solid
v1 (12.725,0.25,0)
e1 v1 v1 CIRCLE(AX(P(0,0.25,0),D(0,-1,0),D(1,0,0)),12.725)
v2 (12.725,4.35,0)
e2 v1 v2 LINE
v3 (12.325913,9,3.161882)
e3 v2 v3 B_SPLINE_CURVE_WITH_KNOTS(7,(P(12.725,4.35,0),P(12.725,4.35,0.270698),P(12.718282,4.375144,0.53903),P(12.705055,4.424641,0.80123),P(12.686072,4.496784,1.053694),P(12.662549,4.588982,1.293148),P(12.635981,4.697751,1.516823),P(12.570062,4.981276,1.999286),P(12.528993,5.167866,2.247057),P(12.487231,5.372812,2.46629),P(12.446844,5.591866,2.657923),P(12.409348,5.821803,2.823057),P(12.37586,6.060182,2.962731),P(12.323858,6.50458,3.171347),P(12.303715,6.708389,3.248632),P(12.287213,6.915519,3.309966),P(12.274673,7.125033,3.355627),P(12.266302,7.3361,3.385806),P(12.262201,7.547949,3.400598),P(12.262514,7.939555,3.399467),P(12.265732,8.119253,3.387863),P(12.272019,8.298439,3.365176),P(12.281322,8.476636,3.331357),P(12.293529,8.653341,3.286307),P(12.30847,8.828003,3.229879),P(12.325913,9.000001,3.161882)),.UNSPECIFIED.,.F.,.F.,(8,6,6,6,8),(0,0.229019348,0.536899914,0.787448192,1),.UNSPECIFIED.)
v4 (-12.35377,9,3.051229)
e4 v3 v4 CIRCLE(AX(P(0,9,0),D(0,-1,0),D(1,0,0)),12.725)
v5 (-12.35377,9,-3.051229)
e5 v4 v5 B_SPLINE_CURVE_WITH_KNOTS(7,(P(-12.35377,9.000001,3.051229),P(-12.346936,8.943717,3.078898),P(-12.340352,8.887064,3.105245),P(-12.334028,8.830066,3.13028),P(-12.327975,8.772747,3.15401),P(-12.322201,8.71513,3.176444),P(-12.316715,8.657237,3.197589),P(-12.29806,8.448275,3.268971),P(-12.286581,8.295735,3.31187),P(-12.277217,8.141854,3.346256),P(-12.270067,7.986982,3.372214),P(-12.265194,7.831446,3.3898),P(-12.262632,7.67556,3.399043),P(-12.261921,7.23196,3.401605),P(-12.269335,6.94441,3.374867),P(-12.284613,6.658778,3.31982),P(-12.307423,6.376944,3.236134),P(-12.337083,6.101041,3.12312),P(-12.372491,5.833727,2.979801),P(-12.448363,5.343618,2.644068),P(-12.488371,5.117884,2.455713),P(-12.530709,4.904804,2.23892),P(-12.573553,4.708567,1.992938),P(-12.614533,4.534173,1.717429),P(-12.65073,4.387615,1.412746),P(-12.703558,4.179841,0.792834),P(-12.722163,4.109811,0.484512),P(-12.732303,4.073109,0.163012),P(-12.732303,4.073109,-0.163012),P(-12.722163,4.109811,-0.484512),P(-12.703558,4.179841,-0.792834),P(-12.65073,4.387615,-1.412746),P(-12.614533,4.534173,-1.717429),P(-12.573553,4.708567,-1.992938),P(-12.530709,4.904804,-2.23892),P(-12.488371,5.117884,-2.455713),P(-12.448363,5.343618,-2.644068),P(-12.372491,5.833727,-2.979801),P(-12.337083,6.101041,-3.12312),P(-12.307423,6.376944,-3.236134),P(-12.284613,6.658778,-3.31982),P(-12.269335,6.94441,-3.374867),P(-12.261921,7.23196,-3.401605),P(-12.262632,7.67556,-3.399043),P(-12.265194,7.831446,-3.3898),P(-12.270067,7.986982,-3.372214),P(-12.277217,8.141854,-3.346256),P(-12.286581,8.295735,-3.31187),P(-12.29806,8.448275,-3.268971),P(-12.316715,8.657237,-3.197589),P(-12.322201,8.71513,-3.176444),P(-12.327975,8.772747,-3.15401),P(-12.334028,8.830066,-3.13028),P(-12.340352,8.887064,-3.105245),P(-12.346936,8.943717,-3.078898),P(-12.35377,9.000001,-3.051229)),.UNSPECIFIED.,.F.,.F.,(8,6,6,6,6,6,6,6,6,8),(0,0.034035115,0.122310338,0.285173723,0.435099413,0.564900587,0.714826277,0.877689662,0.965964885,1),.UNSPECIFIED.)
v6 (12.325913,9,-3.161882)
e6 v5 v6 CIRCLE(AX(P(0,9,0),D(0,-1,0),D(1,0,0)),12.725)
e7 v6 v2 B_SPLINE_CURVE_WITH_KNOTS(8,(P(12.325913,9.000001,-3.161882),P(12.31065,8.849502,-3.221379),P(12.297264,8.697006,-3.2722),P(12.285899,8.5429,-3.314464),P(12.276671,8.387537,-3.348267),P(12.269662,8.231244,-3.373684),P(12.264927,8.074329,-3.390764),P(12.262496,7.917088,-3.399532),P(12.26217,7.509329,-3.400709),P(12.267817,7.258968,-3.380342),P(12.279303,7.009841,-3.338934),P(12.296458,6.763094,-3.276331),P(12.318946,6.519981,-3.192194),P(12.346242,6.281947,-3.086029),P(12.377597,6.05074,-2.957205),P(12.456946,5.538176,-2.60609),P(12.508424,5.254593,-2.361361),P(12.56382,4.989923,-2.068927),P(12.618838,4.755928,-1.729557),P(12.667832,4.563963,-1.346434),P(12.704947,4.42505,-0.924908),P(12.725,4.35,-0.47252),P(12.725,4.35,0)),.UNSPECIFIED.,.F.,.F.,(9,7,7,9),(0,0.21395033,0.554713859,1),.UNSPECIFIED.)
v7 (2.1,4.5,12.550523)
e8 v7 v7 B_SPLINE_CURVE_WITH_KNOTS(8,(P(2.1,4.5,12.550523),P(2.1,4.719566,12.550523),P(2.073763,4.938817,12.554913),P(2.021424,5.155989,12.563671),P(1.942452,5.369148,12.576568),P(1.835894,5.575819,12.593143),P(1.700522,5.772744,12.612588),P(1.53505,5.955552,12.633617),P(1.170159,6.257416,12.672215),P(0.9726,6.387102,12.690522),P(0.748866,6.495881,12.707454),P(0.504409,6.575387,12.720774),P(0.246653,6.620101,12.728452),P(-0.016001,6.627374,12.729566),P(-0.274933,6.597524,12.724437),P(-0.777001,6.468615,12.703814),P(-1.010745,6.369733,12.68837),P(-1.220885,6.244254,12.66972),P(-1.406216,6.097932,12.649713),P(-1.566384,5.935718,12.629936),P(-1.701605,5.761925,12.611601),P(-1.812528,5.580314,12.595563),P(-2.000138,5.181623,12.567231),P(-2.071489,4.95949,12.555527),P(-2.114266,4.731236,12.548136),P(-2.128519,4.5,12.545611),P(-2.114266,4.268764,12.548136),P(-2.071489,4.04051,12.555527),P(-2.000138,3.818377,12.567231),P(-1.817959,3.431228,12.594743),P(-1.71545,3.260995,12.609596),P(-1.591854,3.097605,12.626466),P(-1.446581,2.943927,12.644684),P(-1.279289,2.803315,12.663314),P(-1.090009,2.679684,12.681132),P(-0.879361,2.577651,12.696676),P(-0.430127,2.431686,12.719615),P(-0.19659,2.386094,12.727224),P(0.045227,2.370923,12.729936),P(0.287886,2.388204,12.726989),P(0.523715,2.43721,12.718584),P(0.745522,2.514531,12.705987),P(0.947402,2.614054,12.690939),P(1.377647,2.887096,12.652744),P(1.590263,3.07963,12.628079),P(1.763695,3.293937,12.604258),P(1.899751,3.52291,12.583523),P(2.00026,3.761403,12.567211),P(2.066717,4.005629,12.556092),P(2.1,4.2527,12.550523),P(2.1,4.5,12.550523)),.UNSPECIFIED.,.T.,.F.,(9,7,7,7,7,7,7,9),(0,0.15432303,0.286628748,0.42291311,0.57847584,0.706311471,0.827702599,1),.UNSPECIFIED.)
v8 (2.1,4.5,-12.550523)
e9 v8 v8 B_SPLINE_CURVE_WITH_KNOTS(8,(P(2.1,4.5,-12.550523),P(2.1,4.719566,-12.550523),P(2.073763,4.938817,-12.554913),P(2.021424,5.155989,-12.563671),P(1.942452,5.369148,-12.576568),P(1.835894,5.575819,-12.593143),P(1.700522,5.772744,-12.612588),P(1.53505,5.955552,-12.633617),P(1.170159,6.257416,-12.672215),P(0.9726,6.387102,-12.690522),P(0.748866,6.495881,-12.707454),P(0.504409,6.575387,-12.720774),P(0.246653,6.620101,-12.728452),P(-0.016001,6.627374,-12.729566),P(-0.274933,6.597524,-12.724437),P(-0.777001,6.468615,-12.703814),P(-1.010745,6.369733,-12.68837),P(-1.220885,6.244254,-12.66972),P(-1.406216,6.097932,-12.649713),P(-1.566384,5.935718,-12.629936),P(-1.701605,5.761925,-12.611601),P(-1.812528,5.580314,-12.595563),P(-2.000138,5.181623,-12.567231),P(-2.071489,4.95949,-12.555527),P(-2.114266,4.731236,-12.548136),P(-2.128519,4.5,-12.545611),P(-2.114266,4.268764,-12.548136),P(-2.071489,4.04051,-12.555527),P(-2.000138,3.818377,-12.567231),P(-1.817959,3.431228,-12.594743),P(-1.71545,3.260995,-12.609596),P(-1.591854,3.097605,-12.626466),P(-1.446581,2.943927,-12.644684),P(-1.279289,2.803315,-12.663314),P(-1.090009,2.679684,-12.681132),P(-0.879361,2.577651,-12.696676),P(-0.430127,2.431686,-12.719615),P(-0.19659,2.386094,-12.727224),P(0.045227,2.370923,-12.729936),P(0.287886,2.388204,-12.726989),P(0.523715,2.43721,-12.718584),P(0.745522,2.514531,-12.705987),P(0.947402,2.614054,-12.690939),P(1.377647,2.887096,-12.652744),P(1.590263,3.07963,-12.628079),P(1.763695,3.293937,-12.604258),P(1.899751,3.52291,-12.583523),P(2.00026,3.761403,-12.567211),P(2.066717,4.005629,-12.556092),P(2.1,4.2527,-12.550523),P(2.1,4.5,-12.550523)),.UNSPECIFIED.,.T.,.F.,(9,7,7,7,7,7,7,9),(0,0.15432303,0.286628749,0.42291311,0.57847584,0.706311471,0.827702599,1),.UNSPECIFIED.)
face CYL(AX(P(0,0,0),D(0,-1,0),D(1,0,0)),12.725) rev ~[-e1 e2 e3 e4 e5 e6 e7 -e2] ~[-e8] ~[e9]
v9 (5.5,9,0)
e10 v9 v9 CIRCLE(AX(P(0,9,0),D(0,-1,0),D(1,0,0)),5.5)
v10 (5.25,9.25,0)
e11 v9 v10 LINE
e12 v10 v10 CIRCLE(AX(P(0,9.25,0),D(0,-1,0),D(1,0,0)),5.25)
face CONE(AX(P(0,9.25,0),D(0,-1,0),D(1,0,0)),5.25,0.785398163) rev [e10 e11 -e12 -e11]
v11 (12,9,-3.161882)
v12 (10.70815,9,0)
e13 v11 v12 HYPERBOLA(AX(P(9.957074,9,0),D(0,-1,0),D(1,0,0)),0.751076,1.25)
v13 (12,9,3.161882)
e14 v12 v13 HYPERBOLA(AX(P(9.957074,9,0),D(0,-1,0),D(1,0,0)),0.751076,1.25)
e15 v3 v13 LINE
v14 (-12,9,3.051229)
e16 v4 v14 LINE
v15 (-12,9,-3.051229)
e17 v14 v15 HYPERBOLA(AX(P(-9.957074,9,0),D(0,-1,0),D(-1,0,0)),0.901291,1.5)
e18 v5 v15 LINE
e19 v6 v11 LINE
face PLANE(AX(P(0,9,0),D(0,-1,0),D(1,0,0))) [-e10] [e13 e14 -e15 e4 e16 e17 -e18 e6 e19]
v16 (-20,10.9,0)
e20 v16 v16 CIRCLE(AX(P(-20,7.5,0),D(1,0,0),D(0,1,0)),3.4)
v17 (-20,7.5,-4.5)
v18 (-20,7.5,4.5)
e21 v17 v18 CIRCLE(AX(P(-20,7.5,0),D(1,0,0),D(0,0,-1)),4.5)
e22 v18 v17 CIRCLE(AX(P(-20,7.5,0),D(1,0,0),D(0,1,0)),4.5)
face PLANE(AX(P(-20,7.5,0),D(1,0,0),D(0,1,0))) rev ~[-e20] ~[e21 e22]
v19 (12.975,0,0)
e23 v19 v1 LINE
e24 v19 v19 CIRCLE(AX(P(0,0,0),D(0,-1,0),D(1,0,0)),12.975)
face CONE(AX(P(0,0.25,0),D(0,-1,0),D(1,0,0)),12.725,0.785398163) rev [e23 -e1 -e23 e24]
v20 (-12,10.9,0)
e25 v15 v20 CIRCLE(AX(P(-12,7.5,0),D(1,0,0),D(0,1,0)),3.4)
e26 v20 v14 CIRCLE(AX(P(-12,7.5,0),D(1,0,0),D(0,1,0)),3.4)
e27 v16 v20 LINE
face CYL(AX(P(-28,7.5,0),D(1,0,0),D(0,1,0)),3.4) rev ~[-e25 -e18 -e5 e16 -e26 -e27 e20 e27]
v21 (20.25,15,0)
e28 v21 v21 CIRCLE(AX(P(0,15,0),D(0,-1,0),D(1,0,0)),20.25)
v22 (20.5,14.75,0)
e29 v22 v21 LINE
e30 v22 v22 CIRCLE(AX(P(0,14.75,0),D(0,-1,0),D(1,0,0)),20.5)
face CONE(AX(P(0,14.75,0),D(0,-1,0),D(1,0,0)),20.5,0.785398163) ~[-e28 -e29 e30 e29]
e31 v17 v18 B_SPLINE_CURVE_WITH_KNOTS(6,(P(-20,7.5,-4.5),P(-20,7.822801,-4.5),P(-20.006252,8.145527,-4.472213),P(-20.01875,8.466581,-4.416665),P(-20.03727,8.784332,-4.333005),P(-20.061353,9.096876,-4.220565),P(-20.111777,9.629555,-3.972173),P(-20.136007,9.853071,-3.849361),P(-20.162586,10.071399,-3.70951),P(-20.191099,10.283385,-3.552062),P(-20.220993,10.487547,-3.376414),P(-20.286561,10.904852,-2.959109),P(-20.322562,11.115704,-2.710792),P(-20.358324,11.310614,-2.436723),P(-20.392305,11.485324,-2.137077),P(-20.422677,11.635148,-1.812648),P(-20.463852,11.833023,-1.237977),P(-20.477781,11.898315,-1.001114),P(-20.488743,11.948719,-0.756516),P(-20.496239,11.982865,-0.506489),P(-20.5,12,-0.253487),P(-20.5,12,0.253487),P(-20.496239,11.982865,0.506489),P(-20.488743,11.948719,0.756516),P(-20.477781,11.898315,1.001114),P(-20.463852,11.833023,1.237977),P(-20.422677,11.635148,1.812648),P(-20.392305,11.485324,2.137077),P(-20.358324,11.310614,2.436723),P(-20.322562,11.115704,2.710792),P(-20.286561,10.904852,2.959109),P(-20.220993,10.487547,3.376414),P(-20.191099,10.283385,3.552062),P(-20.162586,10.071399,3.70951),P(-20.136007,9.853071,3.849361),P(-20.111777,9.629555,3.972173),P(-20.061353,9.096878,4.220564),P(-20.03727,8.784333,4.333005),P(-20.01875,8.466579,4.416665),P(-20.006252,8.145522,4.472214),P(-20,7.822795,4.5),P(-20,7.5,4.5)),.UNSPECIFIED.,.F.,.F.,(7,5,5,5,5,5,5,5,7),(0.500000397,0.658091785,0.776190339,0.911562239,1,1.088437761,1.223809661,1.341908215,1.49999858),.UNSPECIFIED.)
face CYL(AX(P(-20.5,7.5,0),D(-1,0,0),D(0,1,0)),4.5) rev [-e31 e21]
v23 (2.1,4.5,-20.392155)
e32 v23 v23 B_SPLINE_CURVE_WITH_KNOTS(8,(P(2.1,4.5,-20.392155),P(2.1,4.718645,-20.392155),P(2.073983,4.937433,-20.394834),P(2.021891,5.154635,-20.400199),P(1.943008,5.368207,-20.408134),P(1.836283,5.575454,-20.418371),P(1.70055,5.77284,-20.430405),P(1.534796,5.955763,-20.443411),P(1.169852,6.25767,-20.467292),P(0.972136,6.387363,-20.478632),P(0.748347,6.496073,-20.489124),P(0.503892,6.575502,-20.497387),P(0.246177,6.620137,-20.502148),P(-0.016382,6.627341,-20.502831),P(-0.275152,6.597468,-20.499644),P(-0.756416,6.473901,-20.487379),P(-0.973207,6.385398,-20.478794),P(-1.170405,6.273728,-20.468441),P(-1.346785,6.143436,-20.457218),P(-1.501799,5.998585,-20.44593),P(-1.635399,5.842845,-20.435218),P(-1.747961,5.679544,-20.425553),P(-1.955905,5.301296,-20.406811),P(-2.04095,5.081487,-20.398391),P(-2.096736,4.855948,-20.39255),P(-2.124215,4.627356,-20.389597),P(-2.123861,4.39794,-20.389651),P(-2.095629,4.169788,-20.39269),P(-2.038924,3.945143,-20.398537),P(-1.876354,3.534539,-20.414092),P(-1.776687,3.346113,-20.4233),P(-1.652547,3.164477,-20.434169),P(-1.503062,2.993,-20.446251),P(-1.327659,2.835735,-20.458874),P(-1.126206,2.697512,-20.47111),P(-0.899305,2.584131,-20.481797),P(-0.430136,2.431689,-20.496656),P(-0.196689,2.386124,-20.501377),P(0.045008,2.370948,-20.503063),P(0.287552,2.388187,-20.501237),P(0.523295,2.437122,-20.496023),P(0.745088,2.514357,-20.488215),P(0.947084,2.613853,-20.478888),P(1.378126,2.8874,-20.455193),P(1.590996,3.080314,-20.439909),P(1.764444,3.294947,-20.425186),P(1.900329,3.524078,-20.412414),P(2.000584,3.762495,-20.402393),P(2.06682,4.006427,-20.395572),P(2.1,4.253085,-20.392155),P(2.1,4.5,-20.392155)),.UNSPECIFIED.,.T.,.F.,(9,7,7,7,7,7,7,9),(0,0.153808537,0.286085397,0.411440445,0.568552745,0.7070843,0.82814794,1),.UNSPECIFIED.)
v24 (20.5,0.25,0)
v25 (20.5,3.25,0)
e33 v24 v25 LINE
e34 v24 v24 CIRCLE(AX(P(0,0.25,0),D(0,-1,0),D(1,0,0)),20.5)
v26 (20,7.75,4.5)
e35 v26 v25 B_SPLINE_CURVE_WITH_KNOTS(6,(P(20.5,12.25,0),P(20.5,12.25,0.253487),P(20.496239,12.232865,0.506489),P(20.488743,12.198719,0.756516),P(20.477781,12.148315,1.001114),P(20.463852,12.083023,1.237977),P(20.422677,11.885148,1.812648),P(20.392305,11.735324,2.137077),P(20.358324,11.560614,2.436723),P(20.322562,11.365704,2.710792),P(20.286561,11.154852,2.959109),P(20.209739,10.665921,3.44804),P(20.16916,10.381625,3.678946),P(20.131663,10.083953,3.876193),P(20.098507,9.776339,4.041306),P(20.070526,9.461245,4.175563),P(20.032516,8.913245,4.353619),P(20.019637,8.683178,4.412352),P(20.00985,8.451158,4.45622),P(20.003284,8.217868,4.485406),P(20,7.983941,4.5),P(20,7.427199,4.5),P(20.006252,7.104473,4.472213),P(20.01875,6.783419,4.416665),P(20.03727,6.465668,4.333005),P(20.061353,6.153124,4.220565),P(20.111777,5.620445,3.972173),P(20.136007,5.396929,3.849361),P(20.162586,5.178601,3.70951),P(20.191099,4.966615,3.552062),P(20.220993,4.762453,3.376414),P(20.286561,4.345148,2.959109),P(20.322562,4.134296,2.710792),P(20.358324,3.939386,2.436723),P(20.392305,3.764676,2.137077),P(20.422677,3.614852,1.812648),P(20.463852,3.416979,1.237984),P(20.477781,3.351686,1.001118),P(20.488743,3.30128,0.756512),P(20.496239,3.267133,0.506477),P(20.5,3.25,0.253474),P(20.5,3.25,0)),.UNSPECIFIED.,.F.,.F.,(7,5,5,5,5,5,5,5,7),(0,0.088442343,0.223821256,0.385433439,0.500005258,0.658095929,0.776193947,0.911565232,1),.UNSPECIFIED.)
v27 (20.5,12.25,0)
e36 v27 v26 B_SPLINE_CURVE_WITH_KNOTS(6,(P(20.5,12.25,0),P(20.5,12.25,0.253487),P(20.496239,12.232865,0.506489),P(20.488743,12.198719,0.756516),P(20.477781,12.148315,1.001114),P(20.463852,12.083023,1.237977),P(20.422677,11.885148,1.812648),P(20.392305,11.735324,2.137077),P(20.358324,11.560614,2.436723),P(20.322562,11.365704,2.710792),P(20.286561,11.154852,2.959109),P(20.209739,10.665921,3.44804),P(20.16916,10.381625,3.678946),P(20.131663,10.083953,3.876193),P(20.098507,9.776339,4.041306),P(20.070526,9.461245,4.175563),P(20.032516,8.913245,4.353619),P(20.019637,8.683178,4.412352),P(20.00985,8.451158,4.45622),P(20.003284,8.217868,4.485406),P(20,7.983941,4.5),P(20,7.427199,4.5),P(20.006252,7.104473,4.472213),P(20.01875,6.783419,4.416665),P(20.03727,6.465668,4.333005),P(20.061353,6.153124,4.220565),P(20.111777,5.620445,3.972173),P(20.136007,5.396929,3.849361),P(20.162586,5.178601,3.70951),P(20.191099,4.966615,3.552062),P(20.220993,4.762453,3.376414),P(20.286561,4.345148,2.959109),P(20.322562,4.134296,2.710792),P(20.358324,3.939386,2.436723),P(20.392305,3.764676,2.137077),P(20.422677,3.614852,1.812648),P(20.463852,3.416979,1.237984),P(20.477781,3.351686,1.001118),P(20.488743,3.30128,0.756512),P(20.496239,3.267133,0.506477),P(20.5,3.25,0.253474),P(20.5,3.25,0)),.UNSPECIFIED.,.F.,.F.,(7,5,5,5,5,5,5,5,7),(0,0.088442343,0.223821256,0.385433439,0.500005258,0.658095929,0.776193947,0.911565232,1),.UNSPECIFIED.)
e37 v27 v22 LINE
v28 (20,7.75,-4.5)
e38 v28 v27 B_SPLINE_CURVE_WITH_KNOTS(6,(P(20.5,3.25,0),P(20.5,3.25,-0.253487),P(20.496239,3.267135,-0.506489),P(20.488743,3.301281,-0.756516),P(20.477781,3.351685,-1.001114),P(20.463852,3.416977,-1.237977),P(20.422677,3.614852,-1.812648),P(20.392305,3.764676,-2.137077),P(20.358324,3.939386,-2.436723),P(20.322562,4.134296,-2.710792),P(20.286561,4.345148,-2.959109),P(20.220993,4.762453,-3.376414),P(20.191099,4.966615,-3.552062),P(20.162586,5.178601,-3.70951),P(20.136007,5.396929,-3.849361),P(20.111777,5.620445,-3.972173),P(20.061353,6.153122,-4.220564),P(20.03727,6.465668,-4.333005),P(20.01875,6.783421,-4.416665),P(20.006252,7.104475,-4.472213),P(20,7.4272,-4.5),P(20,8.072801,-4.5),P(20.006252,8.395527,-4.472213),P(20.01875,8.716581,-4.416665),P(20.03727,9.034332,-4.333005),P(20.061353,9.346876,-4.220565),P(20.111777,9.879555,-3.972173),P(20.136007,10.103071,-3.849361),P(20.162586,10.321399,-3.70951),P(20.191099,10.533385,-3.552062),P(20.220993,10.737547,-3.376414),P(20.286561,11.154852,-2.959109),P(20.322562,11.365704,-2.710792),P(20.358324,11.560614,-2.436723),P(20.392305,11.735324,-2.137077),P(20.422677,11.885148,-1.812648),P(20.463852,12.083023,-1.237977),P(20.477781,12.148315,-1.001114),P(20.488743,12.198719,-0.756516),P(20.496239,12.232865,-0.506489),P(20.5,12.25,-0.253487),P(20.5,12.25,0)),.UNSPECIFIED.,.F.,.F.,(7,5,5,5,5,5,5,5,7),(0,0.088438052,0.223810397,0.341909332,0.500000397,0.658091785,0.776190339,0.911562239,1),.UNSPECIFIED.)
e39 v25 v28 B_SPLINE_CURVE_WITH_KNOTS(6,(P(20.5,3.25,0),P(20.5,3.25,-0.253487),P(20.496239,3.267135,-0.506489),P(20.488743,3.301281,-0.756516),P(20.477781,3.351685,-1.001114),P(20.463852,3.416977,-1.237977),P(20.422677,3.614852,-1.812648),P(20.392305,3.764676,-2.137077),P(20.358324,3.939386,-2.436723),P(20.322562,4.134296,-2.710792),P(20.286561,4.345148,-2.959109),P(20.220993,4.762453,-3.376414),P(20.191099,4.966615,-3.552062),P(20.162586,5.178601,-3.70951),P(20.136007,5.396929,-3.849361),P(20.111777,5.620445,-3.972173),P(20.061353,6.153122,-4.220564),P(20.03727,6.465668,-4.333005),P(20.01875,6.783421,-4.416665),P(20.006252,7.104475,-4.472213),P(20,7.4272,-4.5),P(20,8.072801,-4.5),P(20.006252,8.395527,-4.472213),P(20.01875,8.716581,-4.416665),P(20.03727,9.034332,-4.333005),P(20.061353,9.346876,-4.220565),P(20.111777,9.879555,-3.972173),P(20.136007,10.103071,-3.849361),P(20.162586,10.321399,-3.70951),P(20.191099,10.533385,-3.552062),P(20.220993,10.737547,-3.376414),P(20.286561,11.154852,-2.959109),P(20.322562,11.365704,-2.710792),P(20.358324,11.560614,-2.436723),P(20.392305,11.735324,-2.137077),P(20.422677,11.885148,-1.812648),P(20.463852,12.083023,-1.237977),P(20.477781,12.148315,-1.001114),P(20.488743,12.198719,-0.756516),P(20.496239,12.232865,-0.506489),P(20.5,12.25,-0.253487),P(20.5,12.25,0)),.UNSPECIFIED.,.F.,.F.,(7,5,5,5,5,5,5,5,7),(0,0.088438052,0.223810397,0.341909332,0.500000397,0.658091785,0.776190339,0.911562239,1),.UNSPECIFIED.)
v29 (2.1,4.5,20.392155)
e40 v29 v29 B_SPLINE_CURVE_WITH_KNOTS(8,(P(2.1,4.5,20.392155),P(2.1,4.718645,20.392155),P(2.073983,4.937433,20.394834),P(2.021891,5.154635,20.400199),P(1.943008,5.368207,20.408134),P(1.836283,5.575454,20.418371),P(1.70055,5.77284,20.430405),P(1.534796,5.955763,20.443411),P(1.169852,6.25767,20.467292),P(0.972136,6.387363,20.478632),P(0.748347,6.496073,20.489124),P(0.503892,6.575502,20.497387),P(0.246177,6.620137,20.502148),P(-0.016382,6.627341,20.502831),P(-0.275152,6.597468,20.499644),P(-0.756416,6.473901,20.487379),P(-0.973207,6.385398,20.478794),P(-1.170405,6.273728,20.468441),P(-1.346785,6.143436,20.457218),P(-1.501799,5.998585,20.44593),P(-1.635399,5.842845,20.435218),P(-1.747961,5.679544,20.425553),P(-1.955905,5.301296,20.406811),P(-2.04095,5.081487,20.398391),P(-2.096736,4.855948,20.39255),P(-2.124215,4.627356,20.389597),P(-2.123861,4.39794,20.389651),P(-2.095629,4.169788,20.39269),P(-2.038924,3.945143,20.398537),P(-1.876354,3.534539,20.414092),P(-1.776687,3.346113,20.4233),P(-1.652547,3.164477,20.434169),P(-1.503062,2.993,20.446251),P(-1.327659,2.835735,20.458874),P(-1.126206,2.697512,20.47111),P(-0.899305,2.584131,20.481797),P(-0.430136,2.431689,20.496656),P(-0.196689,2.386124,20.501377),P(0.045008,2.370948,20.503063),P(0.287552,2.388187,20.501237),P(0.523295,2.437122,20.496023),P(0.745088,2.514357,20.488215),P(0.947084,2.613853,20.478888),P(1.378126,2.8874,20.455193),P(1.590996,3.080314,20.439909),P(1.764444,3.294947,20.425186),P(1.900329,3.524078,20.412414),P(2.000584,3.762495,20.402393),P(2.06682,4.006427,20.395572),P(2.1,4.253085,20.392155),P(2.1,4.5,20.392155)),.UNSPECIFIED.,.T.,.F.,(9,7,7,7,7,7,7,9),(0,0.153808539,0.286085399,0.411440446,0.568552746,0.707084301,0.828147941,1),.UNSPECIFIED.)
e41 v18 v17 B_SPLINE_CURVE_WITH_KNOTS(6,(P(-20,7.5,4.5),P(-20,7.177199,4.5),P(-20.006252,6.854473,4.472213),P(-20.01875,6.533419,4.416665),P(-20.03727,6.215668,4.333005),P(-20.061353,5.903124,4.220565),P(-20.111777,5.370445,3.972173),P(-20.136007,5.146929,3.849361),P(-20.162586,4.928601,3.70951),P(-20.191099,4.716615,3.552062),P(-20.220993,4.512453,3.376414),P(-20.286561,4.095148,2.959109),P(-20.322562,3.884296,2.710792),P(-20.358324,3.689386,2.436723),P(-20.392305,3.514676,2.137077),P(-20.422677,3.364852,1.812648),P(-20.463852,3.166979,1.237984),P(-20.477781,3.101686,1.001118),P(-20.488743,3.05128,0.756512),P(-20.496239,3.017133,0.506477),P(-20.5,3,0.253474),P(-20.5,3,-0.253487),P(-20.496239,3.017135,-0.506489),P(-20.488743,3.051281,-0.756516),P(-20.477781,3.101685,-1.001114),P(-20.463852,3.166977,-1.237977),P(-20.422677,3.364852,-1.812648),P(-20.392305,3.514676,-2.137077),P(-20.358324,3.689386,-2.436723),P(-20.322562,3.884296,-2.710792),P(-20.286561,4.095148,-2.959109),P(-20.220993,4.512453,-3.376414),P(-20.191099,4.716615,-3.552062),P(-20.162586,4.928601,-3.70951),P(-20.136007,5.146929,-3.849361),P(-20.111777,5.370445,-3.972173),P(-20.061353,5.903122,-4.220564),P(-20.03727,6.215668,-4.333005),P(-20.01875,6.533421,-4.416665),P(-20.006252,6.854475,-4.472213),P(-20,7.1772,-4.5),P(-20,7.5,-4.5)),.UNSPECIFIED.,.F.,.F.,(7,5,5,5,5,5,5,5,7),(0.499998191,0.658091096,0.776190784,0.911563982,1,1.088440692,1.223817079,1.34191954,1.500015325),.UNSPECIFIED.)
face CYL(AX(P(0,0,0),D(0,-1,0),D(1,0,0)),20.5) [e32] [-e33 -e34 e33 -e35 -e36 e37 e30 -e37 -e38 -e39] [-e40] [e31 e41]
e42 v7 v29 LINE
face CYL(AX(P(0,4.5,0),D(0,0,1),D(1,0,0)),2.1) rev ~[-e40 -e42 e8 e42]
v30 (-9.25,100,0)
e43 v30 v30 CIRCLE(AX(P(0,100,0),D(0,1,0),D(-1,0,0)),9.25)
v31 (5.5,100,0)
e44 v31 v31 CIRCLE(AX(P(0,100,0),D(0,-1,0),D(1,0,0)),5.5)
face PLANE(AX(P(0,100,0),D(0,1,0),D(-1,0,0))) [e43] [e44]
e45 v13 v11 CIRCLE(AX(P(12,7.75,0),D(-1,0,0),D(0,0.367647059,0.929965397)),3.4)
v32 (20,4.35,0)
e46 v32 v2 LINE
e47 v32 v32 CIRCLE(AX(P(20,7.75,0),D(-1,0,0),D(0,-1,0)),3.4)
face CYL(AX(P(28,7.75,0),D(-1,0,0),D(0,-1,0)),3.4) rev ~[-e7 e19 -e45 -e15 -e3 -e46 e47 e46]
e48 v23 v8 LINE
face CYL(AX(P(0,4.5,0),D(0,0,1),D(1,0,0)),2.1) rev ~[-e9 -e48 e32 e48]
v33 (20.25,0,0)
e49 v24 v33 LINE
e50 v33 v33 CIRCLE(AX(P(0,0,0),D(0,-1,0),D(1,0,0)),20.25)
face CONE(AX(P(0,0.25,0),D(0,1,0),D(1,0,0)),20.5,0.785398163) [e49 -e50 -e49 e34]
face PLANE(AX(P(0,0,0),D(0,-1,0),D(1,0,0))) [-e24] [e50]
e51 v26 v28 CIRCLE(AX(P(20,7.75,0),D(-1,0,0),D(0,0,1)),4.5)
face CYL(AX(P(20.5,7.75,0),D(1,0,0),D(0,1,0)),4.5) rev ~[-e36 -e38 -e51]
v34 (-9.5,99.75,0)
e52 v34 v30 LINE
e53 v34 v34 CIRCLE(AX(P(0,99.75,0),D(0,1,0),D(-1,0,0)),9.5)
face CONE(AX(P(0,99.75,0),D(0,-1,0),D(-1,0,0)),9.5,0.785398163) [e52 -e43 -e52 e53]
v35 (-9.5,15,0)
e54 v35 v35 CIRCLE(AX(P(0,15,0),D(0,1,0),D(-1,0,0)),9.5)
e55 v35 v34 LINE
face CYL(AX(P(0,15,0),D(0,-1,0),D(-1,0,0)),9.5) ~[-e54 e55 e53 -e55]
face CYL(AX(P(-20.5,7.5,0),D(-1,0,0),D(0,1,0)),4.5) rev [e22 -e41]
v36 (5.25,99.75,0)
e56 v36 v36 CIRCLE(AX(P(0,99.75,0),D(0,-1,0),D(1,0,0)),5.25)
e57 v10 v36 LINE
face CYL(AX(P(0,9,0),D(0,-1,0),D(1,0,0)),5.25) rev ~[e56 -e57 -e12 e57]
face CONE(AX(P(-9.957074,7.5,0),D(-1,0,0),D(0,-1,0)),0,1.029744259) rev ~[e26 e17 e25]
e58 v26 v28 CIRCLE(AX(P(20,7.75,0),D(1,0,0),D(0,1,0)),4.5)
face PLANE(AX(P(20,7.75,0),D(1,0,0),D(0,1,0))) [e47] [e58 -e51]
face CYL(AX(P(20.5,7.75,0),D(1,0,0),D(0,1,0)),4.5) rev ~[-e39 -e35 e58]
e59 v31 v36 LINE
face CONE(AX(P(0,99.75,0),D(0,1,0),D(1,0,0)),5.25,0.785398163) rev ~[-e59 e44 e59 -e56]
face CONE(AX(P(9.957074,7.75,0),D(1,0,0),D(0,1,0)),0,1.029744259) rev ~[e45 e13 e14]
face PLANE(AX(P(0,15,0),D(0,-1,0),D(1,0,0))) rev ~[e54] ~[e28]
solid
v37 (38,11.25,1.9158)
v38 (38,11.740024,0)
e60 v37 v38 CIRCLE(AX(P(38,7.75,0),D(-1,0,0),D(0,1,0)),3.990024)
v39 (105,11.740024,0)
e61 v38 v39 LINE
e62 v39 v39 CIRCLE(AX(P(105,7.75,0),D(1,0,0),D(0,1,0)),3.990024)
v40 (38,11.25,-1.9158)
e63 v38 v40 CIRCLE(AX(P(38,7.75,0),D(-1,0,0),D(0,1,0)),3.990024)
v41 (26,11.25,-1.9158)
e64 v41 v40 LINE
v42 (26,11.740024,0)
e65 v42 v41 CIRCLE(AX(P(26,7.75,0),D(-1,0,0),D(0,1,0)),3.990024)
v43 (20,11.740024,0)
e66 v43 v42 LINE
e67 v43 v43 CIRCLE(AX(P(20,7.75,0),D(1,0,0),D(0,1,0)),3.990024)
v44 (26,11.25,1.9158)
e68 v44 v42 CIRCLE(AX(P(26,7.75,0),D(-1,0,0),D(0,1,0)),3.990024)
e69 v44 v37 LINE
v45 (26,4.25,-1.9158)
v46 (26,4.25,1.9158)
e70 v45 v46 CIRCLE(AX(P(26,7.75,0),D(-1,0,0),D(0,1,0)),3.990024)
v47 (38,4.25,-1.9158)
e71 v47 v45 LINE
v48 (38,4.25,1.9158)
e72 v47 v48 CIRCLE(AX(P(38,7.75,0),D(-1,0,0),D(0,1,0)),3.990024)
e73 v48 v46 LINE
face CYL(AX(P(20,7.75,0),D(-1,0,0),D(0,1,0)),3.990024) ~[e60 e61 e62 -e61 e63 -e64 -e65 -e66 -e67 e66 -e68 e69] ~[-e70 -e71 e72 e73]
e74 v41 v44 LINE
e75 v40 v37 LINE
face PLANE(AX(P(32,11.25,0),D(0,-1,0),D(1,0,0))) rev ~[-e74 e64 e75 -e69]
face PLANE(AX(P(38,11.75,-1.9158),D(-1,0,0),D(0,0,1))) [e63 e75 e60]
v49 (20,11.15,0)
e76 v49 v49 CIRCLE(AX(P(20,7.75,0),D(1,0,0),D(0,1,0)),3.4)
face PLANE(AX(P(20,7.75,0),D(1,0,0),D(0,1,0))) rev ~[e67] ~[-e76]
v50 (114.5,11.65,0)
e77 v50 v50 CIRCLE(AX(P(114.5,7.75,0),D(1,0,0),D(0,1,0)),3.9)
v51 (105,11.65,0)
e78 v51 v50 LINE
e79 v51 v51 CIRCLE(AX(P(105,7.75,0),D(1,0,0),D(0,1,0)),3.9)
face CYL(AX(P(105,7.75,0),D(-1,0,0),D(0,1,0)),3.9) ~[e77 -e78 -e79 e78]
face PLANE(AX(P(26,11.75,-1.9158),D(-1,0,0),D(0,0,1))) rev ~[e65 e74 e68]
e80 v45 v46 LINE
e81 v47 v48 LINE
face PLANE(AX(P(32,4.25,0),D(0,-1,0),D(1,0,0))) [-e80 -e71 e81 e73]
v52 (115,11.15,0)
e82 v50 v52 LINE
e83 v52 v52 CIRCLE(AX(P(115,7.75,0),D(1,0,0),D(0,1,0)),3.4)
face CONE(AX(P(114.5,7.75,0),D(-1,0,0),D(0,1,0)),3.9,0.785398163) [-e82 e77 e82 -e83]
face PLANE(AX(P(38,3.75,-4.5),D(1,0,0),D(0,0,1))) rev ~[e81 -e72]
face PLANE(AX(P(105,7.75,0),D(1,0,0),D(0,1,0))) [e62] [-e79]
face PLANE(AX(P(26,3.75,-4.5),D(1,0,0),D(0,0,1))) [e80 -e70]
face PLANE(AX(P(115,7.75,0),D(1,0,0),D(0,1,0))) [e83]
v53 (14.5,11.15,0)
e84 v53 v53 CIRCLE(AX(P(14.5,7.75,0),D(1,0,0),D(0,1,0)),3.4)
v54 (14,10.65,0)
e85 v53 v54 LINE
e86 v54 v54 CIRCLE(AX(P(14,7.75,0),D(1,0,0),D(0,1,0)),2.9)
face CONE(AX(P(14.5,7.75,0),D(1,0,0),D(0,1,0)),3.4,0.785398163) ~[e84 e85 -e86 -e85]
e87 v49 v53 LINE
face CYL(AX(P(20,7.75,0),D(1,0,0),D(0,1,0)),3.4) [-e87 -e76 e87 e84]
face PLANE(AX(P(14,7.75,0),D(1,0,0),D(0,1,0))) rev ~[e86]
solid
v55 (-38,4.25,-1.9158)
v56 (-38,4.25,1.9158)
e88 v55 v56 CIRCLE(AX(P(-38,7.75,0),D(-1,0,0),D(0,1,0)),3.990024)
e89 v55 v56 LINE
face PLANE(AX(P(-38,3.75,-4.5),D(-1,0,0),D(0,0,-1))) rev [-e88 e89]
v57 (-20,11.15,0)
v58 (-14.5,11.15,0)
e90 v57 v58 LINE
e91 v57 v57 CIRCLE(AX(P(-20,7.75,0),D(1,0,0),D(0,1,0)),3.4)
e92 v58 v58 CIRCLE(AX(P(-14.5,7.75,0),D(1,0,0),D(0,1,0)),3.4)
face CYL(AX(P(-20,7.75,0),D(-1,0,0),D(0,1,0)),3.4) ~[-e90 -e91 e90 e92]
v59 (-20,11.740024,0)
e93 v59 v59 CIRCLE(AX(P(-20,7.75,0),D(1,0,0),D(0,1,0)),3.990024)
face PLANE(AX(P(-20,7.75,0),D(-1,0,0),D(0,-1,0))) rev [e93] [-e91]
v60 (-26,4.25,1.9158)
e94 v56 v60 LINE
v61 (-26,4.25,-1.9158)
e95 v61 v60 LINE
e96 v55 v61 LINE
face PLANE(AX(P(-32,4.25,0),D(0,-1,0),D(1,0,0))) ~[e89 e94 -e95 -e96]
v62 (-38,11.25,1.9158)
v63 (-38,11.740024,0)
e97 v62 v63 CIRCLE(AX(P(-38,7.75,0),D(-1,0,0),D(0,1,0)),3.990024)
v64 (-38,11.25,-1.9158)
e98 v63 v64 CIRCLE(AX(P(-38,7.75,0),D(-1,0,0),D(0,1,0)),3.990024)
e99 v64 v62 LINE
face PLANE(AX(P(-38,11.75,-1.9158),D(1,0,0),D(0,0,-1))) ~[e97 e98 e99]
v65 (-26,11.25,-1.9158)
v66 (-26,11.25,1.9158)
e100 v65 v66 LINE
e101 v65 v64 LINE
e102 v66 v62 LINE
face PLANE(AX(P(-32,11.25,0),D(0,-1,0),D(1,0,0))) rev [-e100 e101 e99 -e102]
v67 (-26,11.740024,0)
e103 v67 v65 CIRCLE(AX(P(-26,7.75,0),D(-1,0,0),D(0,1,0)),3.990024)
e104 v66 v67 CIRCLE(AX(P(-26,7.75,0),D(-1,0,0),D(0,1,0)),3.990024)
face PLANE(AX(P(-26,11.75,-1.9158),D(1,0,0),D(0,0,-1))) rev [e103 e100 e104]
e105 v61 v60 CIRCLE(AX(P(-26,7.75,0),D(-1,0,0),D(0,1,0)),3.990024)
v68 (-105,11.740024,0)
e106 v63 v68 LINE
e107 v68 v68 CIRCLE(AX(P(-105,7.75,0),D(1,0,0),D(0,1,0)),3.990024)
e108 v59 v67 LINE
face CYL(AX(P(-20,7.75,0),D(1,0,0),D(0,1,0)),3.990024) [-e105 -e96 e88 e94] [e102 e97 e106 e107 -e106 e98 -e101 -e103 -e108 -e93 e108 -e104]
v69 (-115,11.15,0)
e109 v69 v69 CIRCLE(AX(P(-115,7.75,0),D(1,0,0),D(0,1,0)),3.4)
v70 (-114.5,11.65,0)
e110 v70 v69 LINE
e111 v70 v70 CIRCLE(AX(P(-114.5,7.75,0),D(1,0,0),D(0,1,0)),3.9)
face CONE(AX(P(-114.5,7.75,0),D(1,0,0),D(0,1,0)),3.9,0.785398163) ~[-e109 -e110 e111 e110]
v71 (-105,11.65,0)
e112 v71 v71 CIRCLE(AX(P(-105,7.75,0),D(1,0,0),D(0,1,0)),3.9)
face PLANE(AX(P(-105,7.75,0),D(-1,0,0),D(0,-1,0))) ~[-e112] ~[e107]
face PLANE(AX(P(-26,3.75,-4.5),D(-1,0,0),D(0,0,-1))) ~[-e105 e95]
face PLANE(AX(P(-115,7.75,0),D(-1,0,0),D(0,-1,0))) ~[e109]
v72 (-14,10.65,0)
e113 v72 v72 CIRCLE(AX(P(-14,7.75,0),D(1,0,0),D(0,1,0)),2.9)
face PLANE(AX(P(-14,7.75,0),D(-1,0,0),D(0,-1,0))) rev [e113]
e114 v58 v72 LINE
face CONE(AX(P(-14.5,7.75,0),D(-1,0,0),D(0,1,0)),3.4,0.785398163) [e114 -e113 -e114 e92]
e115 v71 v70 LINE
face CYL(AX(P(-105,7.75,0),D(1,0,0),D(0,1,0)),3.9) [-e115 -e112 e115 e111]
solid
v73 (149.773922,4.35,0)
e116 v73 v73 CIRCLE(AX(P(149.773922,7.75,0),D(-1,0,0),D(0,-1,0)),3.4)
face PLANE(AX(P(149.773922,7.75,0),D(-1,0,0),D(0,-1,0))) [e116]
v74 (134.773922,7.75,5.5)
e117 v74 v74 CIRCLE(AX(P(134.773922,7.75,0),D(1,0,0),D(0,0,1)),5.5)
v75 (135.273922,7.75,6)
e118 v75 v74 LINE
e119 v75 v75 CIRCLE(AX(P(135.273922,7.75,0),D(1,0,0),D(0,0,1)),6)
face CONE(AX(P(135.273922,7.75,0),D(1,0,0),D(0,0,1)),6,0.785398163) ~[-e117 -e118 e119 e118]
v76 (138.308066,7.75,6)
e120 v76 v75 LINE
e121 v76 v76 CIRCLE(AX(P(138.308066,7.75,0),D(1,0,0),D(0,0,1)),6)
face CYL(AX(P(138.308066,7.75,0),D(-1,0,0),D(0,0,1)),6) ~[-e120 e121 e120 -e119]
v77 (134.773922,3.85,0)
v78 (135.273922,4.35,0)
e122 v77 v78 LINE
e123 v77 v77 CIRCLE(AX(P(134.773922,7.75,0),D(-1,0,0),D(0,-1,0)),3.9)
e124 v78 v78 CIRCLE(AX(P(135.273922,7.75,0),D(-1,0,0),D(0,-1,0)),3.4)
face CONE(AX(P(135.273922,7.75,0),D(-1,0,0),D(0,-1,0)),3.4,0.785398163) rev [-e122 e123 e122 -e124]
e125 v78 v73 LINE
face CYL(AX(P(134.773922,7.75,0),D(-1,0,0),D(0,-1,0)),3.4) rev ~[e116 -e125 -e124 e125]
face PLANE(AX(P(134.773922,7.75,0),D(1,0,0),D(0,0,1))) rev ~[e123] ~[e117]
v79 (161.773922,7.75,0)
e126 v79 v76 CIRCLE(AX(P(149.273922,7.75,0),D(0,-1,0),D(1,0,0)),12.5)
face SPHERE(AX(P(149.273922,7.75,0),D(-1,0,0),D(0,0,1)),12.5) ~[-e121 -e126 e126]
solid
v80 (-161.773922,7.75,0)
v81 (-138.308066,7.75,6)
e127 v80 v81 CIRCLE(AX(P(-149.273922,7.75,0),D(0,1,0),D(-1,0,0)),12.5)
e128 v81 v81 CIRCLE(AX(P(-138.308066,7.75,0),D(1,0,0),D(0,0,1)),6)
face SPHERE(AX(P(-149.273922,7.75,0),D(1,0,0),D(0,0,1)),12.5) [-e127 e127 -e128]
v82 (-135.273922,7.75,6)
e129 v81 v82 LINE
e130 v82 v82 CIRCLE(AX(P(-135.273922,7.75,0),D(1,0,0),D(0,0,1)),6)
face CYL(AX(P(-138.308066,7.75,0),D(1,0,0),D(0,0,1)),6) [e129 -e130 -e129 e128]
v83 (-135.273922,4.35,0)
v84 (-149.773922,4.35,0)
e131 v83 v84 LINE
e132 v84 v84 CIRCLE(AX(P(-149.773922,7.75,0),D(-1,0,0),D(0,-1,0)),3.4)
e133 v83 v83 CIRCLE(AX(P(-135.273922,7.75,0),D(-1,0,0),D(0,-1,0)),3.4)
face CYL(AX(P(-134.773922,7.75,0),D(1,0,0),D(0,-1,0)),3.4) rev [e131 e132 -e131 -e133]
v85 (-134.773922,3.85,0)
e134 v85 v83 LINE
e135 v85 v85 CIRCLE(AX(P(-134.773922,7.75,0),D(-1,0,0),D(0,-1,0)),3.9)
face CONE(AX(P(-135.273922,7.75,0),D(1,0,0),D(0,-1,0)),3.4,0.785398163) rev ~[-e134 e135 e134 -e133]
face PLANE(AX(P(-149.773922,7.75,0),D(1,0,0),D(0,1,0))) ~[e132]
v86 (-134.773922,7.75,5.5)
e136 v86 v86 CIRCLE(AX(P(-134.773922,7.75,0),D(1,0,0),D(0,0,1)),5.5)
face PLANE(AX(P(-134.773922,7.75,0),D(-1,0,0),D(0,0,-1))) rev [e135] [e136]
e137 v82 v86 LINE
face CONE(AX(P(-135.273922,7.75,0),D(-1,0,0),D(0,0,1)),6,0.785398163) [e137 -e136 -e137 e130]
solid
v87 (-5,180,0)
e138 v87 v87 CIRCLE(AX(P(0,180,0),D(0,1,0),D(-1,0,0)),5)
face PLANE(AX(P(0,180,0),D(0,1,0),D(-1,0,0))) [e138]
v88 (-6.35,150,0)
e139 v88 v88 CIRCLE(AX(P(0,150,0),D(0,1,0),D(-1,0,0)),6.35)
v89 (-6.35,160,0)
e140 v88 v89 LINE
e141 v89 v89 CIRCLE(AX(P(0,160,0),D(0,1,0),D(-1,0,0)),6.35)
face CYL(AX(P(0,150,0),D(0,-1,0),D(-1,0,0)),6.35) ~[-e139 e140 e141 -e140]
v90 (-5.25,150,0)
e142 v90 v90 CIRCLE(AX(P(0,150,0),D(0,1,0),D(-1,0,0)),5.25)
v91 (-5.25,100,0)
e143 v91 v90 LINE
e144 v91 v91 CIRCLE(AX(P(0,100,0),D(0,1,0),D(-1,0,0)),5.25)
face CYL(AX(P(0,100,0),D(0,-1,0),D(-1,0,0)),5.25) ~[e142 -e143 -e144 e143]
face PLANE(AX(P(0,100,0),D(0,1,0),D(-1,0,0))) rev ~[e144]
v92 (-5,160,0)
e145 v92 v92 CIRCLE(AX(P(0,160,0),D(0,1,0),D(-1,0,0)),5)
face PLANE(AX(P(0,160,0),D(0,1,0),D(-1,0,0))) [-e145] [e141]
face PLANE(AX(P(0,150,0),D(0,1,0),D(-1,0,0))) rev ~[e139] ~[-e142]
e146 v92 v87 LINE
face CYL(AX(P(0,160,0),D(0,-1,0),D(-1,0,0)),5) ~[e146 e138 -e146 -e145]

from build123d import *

# Parameters (mm, degrees)
F0_R      = 20.5
F1_DEPTH  = 15
F2_R      = 9.5
F3_DEPTH  = 85
F4_R      = 12.725
F5_DEPTH  = 9
F6_R      = 5.25
F7_DEPTH  = 91.001
F8_SIZE   = 0.25
F10_R     = 4.5
F11_DEPTH = 0.5
F13_D     = 6.8
F13_DEPTH = 8
F13_TIP   = 2.0429261047
F15_R     = 4.5
F16_DEPTH = 0.5
F18_D     = 6.8
F18_DEPTH = 8
F18_TIP   = 2.0429261047
F19_R     = 3.4
F20_DEPTH = 6
F21_R     = 3.9900235839
F22_DEPTH = 85
F23_R     = 3.9
F24_DEPTH = 10
F25_SIZE  = 0.5
F30_R     = 3.4
F31_DEPTH = 15
F32_SIZE  = 0.5
F35_W     = 12
F35_H     = 9
F36_DEPTH = 0.5
F37_W     = 12
F37_H     = 3.8315992485
F38_DEPTH = 0.5
F40_R     = 2.1
F41_DEPTH = 25
F42_R     = 5.25
F43_DEPTH = 50
F44_R     = 6.35
F45_DEPTH = 10
F46_R     = 5
F47_DEPTH = 20


with BuildPart() as f1:
    # F0 (on Front) → F1 (new body)
    with BuildSketch(Plane.XZ):
        Circle(F0_R)
    extrude(amount=-F1_DEPTH)

    # F2 (on face) → F3 (join)
    with BuildSketch(Plane(origin=(0, 15, 0), x_dir=(-1, 0, 0), z_dir=(0, 1, 0))):
        Circle(F2_R)
    extrude(amount=F3_DEPTH)

    # F4 (on face) → F5 (cut)
    with BuildSketch(Plane.XZ):
        Circle(F4_R)
    extrude(amount=-F5_DEPTH, mode=Mode.SUBTRACT)

    # F6 (on face) → F7 (cut, through all)
    with BuildSketch(Plane.XZ.offset(-9)):
        Circle(F6_R)
    extrude(amount=-F7_DEPTH, mode=Mode.SUBTRACT)

    # F8
    f8_edges = [f1.edges().sort_by_distance(p)[0] for p in [
        (-20.5, 0, 0),
        (-12.725, 0, 0),
        (-5.25, 9, 0),
        (5.25, 54.5, 0),
        (-5.25, 100, 0),
        (20.5, 7.5, 0),
        (-20.5, 15, 0),
        (9.5, 100, 0),
    ]]
    chamfer(f8_edges, length=F8_SIZE)

    # F10 (on offset) → F11 (cut)
    with BuildSketch(Plane.YZ.offset(20.5)):
        with Locations((7.75, 0)):
            Circle(F10_R)
    extrude(amount=-F11_DEPTH, mode=Mode.SUBTRACT)

    # F13
    with Locations(Plane.YZ.offset(20)):
        with Locations((7.75, 0)):
            Hole(F13_D / 2, depth=F13_DEPTH)
            with Locations((0, 0, -(F13_DEPTH + F13_TIP / 2))):  # 118° drill point
                Cone(0, F13_D / 2, F13_TIP, mode=Mode.SUBTRACT)

    # F15 (on offset) → F16 (cut)
    with BuildSketch(Plane.YZ.offset(-20.5)):
        with Locations((7.5, 0)):
            Circle(F15_R)
    extrude(amount=F16_DEPTH, mode=Mode.SUBTRACT)

    # F18
    with Locations(Plane(origin=(-20, 0, 0), x_dir=(0, -1, 0), z_dir=(-1, 0, 0))):
        with Locations((-7.5, 0)):
            Hole(F18_D / 2, depth=F18_DEPTH)
            with Locations((0, 0, -(F18_DEPTH + F18_TIP / 2))):  # 118° drill point
                Cone(0, F18_D / 2, F18_TIP, mode=Mode.SUBTRACT)

    # F40 (on Top) → F41 (cut, symmetric)
    with BuildSketch(Plane.XY):
        with Locations((0, 4.5)):
            Circle(F40_R)
    extrude(amount=F41_DEPTH, both=True, mode=Mode.SUBTRACT)


with BuildPart() as f20:
    # F19 (on face) → F20 (new body)
    with BuildSketch(Plane.YZ.offset(20)):
        with Locations((7.75, 0)):
            Circle(F19_R)
    extrude(amount=-F20_DEPTH)

    # F21 (on face) → F22 (join)
    with BuildSketch(Plane.YZ.offset(20)):
        with Locations((7.75, 0)):
            Circle(F21_R)
    extrude(amount=F22_DEPTH)

    # F23 (on face) → F24 (join)
    with BuildSketch(Plane.YZ.offset(105)):
        with Locations((7.75, 0)):
            Circle(F23_R)
    extrude(amount=F24_DEPTH)

    # F25
    f25_edges = [f20.edges().sort_by_distance(p)[0] for p in [
        (14, 4.35, 0),
        (115, 3.85, 0),
    ]]
    chamfer(f25_edges, length=F25_SIZE)

    # F35 (on offset) → F36 (cut)
    with BuildSketch(Plane.XZ.offset(-3.75)):
        with Locations((32, 0)):
            Rectangle(F35_W, F35_H)
    extrude(amount=-F36_DEPTH, mode=Mode.SUBTRACT)

    # F37 (on offset) → F38 (cut)
    with BuildSketch(Plane.XZ.offset(-11.75)):
        with Locations((32, 0)):
            Rectangle(F37_W, F37_H)
    extrude(amount=F38_DEPTH, mode=Mode.SUBTRACT)


with BuildPart() as f29:
    # F28 (on plane+point) → F29 (revolve)
    with BuildSketch(Plane.XZ.offset(-7.75)):
        with BuildLine():
            Line((134.7739224189, 0), (161.7739224189, 0))
            ThreePointArc((161.7739224189, 0), (152.3704364875, 12.1103922572), (138.3080663192, 6))
            Line((138.3080663192, 6), (134.7739224189, 6))
            Line((134.7739224189, 6), (134.7739224189, 0))
        make_face()
    revolve(axis=Axis((148.2739224189, 7.75, 0), (1, 0, 0)))

    # F30 (on face) → F31 (cut)
    with BuildSketch(Plane(origin=(134.7739224189, 0, 0), x_dir=(0, -1, 0), z_dir=(-1, 0, 0))):
        with Locations((-7.75, 0)):
            Circle(F30_R)
    extrude(amount=-F31_DEPTH, mode=Mode.SUBTRACT)

    # F32
    f32_edges = [f29.edges().sort_by_distance(p)[0] for p in [
        (134.773922, 7.75, -6),
        (134.773922, 11.15, 0),
    ]]
    chamfer(f32_edges, length=F32_SIZE)


with BuildPart() as f39_1:
    # F39: instance of F20
    add(f20.part.mirror(Plane.YZ))


with BuildPart() as f39_2:
    # F39: instance of F29
    add(f29.part.mirror(Plane.YZ))


with BuildPart() as f43:
    # F42 (on face) → F43 (new body)
    with BuildSketch(Plane(origin=(0, 100, 0), x_dir=(-1, 0, 0), z_dir=(0, 1, 0))):
        Circle(F42_R)
    extrude(amount=F43_DEPTH)

    # F44 (on face) → F45 (join)
    with BuildSketch(Plane(origin=(0, 150, 0), x_dir=(-1, 0, 0), z_dir=(0, 1, 0))):
        Circle(F44_R)
    extrude(amount=F45_DEPTH)

    # F46 (on face) → F47 (join)
    with BuildSketch(Plane(origin=(0, 160, 0), x_dir=(-1, 0, 0), z_dir=(0, 1, 0))):
        Circle(F46_R)
    extrude(amount=F47_DEPTH)


solid = Compound([f1.part, f20.part, f29.part, f39_1.part, f39_2.part, f43.part])
